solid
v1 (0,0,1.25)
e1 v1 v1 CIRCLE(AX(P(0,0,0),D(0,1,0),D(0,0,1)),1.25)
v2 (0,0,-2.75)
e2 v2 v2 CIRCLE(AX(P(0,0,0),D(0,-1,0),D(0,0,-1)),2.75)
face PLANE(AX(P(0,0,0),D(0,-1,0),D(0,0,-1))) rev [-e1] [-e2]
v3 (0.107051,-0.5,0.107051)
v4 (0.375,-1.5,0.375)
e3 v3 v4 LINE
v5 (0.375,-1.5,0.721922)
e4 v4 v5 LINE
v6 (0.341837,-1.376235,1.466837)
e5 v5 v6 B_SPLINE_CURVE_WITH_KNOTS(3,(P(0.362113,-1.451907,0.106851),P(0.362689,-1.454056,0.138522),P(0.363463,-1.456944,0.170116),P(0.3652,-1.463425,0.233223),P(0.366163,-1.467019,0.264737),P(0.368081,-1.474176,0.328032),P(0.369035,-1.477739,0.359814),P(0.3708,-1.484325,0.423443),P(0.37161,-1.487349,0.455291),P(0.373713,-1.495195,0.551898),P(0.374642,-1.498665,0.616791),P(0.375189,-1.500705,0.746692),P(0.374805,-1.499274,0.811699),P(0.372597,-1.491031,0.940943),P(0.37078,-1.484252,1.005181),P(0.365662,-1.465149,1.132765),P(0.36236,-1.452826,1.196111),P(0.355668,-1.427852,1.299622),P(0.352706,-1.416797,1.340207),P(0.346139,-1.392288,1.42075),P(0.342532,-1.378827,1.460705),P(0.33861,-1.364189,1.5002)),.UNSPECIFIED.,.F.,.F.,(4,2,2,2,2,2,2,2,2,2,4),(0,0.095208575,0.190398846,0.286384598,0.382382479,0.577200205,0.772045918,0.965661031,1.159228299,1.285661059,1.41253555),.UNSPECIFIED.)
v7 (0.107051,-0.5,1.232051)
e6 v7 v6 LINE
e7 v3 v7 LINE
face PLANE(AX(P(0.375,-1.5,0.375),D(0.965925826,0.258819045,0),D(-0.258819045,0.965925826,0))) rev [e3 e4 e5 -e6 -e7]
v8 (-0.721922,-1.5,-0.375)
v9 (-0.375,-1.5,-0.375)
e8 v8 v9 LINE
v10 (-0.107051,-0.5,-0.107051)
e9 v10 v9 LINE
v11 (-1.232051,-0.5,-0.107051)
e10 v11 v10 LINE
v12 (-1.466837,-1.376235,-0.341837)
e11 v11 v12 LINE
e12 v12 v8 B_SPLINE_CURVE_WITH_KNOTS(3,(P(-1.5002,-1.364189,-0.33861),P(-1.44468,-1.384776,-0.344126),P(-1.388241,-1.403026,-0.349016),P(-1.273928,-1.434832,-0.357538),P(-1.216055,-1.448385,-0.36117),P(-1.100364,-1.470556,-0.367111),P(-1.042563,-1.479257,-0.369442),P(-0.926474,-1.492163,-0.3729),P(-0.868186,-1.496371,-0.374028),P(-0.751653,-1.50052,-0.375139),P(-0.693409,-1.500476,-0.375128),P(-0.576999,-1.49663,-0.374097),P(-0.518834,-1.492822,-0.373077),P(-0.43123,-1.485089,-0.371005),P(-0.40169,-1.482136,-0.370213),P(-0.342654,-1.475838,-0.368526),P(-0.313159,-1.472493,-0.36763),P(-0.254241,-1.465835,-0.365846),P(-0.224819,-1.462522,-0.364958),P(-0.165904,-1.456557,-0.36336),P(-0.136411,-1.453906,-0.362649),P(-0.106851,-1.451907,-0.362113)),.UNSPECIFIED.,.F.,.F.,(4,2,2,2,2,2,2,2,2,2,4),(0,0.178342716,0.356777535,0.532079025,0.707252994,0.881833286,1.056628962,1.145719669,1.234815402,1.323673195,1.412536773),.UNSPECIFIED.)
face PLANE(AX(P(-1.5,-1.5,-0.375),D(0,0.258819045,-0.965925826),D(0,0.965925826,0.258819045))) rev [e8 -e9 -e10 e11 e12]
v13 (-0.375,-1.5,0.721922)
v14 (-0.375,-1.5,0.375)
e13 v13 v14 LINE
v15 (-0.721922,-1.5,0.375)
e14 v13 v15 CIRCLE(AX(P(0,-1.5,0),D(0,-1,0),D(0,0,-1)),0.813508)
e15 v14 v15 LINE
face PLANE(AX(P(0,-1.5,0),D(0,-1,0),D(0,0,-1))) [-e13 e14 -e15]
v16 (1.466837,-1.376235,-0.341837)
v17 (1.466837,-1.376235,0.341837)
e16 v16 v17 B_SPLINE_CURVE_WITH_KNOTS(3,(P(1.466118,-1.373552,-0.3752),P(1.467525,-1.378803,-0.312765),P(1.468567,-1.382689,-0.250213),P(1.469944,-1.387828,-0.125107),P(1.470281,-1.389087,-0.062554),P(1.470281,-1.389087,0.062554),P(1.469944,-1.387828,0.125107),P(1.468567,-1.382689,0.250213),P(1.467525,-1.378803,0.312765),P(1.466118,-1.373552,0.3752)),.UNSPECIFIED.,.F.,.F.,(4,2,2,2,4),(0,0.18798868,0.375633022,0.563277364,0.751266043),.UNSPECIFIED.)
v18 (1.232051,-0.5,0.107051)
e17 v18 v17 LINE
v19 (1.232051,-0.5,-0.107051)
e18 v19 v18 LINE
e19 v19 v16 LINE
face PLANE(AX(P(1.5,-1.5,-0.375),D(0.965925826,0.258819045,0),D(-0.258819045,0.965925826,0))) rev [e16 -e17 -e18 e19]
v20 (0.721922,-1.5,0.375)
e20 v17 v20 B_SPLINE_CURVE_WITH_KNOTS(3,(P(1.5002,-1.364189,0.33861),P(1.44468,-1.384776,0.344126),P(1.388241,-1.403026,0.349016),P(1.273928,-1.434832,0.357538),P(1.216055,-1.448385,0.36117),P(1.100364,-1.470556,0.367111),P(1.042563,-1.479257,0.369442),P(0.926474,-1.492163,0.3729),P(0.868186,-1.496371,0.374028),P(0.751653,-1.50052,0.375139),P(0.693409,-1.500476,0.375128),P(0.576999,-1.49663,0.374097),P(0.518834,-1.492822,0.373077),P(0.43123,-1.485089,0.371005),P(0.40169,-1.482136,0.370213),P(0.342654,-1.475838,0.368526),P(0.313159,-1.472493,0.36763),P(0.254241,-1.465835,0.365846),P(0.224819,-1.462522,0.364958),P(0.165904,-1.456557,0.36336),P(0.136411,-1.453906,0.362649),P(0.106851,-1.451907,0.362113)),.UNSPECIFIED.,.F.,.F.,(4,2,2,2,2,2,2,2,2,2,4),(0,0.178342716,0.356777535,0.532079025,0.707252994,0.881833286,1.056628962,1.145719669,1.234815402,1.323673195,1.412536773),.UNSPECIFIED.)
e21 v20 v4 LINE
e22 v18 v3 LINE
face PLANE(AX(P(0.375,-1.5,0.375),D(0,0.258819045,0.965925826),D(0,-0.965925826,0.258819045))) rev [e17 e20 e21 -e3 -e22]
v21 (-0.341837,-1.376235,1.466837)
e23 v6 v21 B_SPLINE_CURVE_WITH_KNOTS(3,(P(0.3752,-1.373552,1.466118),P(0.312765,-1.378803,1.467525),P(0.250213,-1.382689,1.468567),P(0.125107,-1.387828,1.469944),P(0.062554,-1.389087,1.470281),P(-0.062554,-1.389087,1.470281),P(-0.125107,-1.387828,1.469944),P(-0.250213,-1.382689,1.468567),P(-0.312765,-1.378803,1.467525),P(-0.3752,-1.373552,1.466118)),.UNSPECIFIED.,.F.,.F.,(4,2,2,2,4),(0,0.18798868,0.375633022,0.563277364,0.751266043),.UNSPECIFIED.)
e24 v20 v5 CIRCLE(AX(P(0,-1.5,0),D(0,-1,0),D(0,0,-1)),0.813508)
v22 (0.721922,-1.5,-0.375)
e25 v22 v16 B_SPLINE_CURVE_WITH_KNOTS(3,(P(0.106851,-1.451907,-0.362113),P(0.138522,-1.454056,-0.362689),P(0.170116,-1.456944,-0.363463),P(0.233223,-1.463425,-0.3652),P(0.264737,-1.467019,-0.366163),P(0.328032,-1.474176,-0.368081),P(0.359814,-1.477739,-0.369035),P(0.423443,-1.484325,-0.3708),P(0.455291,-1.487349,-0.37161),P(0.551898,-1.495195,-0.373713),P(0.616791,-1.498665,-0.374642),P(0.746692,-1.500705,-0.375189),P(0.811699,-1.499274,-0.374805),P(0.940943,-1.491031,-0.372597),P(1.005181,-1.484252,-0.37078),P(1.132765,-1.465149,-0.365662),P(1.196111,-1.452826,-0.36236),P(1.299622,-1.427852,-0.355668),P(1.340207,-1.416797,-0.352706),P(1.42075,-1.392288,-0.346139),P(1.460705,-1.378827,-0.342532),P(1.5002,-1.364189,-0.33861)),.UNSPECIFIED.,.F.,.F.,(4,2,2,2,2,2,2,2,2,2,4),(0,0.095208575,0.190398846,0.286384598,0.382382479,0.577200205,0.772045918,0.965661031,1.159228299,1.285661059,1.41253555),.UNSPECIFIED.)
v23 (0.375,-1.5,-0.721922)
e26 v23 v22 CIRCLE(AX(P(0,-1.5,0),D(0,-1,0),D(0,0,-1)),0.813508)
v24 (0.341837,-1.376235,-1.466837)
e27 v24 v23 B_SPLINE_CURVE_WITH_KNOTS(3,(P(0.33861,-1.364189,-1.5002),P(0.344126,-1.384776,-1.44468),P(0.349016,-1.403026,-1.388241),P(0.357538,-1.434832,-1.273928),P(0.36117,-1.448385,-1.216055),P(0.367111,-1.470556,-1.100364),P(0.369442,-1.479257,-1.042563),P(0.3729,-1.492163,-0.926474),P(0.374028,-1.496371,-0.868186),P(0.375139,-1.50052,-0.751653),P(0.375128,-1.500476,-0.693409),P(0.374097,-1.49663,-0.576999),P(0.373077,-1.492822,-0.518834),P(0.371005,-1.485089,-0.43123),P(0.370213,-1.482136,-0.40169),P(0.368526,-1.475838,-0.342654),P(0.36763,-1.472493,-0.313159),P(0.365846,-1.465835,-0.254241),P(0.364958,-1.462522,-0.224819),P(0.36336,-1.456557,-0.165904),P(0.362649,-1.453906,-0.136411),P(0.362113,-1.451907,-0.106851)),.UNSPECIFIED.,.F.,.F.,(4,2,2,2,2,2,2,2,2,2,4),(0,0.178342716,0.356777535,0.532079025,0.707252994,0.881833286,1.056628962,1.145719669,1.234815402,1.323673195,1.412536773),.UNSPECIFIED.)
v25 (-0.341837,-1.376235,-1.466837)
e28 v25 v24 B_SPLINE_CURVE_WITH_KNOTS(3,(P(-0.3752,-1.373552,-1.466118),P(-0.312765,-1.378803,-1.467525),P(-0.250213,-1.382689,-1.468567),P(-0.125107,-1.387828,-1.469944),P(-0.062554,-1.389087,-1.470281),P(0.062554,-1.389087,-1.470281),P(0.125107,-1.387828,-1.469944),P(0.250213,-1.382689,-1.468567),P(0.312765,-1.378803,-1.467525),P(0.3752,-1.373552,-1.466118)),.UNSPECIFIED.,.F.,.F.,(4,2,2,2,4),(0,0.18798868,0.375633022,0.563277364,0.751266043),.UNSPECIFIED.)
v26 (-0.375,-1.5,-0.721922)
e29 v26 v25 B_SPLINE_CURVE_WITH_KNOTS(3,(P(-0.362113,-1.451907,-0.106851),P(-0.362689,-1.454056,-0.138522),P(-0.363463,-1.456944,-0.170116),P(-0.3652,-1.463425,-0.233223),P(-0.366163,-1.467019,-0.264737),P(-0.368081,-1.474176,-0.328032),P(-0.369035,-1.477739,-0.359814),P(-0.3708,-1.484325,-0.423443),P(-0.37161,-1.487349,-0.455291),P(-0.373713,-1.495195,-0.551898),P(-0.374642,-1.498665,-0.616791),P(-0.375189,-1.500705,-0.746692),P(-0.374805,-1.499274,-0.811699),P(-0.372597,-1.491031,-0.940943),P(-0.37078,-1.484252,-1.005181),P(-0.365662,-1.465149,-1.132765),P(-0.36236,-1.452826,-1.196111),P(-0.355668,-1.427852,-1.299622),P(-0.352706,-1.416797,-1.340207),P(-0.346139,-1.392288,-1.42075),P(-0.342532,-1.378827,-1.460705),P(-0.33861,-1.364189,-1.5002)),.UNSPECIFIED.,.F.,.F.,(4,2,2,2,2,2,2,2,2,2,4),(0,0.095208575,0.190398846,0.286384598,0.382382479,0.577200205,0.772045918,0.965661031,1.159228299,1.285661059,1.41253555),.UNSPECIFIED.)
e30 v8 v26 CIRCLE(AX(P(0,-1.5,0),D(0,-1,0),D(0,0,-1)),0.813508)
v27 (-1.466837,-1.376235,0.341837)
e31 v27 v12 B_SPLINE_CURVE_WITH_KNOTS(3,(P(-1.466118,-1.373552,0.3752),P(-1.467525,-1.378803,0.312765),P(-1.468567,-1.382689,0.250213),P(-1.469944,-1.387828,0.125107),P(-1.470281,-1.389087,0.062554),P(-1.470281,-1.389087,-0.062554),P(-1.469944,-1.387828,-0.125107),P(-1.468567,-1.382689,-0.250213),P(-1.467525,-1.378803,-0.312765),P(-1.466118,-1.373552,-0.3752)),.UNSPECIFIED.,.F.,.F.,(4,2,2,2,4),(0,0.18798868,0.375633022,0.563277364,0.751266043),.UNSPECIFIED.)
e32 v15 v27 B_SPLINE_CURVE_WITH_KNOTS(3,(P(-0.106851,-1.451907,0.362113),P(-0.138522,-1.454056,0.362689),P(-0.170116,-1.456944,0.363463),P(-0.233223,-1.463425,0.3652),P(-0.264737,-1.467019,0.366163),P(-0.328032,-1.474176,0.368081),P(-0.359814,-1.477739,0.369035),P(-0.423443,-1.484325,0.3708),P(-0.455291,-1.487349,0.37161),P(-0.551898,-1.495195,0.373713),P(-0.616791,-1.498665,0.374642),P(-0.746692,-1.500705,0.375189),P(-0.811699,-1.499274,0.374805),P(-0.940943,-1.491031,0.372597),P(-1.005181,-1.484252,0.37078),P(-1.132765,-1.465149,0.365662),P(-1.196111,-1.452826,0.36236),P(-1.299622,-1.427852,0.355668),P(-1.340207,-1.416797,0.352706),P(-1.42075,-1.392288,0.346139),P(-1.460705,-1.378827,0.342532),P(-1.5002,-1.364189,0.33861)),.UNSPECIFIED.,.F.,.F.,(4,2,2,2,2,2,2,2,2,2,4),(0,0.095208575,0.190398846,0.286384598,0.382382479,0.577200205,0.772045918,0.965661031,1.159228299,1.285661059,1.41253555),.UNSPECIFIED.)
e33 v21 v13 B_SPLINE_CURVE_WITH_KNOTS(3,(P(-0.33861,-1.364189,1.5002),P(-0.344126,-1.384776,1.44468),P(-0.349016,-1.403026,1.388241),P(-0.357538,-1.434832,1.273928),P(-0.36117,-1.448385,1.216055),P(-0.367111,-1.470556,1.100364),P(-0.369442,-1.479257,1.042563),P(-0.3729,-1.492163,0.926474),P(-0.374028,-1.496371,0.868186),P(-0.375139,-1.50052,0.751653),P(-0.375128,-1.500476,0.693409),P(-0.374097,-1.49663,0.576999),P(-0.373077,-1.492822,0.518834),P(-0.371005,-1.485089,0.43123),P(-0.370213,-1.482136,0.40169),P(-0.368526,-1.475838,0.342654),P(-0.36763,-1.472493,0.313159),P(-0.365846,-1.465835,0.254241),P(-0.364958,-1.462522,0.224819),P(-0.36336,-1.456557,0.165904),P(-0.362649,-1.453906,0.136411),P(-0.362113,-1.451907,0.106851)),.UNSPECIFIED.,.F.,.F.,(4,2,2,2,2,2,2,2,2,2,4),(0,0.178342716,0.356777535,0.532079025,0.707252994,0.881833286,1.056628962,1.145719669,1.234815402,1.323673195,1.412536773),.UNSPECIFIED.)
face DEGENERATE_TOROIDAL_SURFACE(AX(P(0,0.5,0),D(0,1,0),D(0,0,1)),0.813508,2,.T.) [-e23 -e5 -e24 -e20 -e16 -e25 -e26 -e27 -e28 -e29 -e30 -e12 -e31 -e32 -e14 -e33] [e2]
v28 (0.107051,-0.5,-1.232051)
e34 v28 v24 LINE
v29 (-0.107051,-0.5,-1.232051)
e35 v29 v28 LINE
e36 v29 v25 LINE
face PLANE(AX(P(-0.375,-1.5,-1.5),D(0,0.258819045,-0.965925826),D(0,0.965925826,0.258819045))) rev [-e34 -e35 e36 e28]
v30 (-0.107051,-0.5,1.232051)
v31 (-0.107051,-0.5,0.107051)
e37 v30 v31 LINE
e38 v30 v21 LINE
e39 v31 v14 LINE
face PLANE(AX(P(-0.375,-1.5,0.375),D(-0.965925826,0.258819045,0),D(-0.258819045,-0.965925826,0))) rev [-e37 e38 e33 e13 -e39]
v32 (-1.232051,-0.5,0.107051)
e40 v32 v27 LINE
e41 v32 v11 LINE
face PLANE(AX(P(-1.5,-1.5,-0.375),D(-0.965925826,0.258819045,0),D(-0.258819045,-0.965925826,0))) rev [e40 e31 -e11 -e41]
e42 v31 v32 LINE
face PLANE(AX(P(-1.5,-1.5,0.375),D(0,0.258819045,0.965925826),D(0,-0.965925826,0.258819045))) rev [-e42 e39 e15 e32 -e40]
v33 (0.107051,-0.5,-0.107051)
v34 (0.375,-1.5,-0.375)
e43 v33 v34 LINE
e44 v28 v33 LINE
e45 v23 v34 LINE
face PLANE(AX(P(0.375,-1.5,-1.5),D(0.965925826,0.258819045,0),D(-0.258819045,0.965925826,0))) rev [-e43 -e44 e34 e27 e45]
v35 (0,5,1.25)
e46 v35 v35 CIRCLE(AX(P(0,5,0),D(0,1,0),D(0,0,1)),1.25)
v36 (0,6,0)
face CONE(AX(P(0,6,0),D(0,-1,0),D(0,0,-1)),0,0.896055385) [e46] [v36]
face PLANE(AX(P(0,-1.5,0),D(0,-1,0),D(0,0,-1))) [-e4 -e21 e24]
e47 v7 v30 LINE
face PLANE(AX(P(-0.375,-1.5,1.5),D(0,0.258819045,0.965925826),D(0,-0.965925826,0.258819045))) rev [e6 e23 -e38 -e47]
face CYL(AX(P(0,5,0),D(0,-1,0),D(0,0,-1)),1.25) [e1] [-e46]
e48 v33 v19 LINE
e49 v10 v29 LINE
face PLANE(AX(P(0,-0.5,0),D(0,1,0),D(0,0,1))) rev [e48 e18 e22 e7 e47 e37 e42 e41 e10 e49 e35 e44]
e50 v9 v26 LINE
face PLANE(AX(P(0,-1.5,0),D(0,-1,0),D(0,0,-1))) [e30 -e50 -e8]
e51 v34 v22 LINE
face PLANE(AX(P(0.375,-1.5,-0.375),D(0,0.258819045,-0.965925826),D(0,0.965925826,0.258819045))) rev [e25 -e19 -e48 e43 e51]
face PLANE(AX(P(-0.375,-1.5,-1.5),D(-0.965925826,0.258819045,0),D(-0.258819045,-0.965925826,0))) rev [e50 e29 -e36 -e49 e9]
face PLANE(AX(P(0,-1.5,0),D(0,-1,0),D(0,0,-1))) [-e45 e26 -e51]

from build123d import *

# Parameters (mm, degrees)
SKETCH1_R           = 1.25
BOSS_EXTRUDE1_DEPTH = 5
SKETCH2_R           = 2.75
BOSS_EXTRUDE2_DEPTH = 1.5
FILLET1_R           = 2
CUT_EXTRUDE1_DEPTH  = 1
CUT_EXTRUDE1_DRAFT  = -15


with BuildPart() as part:
    # Sketch1 → Boss-Extrude1 (new body)
    with BuildSketch(Plane(origin=(0, 0, 0), x_dir=(1, 0, 0), z_dir=(0, 1, 0))):
        with Locations(Location((0, 0, 0), (0, 0, 270))):
            Circle(SKETCH1_R)
    extrude(amount=BOSS_EXTRUDE1_DEPTH)

    # Sketch2 → Boss-Extrude2 (add)
    with BuildSketch(Plane.XZ):
        with Locations(Location((0, 0, 0), (0, 0, 270))):
            Circle(SKETCH2_R)
    extrude(amount=BOSS_EXTRUDE2_DEPTH)

    # Fillet1
    # the kernel refuses this fillet: 2 mm, written as the material it takes off along each edge
    with BuildSketch(Plane(origin=(0, -1.5, 0), x_dir=(0, 0, -1), z_dir=(-1, 0, 0))) as fillet1_piece_1:
        with BuildLine():
            CenterArc((0.813508327, -2), FILLET1_R, 14.477512186, 75.522487814)
            Line((0.813508327, 0), (0.813508327, 0.04))
            Line((0.813508327, 0.04), (2.75, 0.04))
            Line((2.75, 0.04), (2.79, 0))
            ThreePointArc((2.79, 0), (2.79, -0.75), (2.788729833, -1.49))
            Line((2.788729833, -1.49), (2.75, -1.5))
        make_face()
    revolve(axis=Axis((0, -1.5, 0), (0, -1, 0)), mode=Mode.SUBTRACT)


with BuildPart() as cut_extrude1_tool:
    # Sketch3 → Cut-Extrude1 (with draft: the straight prism first)
    with BuildSketch(Plane.XZ.offset(1.5)):
        Polygon((0.375, 0.375), (0.375, 1.5), (-0.375, 1.5), (-0.375, 0.375), (-1.5, 0.375), (-1.5, -0.375), (-0.375, -0.375), (-0.375, -1.5), (0.375, -1.5), (0.375, -0.375), (1.5, -0.375), (1.5, 0.375), align=None)
    extrude(amount=-CUT_EXTRUDE1_DEPTH)
    # Cut-Extrude1: the draft: its side faces are tilted about the plane it starts from
    cut_extrude1_sides = [cut_extrude1_tool.faces().sort_by_distance(p)[0] for p in [
        (0.375, -1, 0.9375),
        (0, -1, 1.5),
        (-0.375, -1, 0.9375),
        (-0.9375, -1, 0.375),
        (-1.5, -1, 0),
        (-0.9375, -1, -0.375),
        (-0.375, -1, -0.9375),
        (0, -1, -1.5),
        (0.375, -1, -0.9375),
        (0.9375, -1, -0.375),
        (1.5, -1, 0),
        (0.9375, -1, 0.375),
    ]]
    draft(cut_extrude1_sides, Plane.XZ.offset(1.5), CUT_EXTRUDE1_DRAFT)


with BuildPart() as part_1:
    add(part.part)

    # Cut-Extrude1: cut by cut_extrude1_tool
    add(cut_extrude1_tool.part, mode=Mode.SUBTRACT)

    # Sketch11 → Revolve2 (revolve)
    with BuildSketch(Plane.XY, mode=Mode.PRIVATE) as revolve2_sk:
        Polygon((0, 5), (0, 6), (-1.25, 5), align=None)
    revolve(revolve2_sk.sketch.rotate(Axis((0, 5, 0), (0, 1, 0)), 103.11828208), axis=Axis((0, 5, 0), (0, 1, 0)))


solid = part_1.part
